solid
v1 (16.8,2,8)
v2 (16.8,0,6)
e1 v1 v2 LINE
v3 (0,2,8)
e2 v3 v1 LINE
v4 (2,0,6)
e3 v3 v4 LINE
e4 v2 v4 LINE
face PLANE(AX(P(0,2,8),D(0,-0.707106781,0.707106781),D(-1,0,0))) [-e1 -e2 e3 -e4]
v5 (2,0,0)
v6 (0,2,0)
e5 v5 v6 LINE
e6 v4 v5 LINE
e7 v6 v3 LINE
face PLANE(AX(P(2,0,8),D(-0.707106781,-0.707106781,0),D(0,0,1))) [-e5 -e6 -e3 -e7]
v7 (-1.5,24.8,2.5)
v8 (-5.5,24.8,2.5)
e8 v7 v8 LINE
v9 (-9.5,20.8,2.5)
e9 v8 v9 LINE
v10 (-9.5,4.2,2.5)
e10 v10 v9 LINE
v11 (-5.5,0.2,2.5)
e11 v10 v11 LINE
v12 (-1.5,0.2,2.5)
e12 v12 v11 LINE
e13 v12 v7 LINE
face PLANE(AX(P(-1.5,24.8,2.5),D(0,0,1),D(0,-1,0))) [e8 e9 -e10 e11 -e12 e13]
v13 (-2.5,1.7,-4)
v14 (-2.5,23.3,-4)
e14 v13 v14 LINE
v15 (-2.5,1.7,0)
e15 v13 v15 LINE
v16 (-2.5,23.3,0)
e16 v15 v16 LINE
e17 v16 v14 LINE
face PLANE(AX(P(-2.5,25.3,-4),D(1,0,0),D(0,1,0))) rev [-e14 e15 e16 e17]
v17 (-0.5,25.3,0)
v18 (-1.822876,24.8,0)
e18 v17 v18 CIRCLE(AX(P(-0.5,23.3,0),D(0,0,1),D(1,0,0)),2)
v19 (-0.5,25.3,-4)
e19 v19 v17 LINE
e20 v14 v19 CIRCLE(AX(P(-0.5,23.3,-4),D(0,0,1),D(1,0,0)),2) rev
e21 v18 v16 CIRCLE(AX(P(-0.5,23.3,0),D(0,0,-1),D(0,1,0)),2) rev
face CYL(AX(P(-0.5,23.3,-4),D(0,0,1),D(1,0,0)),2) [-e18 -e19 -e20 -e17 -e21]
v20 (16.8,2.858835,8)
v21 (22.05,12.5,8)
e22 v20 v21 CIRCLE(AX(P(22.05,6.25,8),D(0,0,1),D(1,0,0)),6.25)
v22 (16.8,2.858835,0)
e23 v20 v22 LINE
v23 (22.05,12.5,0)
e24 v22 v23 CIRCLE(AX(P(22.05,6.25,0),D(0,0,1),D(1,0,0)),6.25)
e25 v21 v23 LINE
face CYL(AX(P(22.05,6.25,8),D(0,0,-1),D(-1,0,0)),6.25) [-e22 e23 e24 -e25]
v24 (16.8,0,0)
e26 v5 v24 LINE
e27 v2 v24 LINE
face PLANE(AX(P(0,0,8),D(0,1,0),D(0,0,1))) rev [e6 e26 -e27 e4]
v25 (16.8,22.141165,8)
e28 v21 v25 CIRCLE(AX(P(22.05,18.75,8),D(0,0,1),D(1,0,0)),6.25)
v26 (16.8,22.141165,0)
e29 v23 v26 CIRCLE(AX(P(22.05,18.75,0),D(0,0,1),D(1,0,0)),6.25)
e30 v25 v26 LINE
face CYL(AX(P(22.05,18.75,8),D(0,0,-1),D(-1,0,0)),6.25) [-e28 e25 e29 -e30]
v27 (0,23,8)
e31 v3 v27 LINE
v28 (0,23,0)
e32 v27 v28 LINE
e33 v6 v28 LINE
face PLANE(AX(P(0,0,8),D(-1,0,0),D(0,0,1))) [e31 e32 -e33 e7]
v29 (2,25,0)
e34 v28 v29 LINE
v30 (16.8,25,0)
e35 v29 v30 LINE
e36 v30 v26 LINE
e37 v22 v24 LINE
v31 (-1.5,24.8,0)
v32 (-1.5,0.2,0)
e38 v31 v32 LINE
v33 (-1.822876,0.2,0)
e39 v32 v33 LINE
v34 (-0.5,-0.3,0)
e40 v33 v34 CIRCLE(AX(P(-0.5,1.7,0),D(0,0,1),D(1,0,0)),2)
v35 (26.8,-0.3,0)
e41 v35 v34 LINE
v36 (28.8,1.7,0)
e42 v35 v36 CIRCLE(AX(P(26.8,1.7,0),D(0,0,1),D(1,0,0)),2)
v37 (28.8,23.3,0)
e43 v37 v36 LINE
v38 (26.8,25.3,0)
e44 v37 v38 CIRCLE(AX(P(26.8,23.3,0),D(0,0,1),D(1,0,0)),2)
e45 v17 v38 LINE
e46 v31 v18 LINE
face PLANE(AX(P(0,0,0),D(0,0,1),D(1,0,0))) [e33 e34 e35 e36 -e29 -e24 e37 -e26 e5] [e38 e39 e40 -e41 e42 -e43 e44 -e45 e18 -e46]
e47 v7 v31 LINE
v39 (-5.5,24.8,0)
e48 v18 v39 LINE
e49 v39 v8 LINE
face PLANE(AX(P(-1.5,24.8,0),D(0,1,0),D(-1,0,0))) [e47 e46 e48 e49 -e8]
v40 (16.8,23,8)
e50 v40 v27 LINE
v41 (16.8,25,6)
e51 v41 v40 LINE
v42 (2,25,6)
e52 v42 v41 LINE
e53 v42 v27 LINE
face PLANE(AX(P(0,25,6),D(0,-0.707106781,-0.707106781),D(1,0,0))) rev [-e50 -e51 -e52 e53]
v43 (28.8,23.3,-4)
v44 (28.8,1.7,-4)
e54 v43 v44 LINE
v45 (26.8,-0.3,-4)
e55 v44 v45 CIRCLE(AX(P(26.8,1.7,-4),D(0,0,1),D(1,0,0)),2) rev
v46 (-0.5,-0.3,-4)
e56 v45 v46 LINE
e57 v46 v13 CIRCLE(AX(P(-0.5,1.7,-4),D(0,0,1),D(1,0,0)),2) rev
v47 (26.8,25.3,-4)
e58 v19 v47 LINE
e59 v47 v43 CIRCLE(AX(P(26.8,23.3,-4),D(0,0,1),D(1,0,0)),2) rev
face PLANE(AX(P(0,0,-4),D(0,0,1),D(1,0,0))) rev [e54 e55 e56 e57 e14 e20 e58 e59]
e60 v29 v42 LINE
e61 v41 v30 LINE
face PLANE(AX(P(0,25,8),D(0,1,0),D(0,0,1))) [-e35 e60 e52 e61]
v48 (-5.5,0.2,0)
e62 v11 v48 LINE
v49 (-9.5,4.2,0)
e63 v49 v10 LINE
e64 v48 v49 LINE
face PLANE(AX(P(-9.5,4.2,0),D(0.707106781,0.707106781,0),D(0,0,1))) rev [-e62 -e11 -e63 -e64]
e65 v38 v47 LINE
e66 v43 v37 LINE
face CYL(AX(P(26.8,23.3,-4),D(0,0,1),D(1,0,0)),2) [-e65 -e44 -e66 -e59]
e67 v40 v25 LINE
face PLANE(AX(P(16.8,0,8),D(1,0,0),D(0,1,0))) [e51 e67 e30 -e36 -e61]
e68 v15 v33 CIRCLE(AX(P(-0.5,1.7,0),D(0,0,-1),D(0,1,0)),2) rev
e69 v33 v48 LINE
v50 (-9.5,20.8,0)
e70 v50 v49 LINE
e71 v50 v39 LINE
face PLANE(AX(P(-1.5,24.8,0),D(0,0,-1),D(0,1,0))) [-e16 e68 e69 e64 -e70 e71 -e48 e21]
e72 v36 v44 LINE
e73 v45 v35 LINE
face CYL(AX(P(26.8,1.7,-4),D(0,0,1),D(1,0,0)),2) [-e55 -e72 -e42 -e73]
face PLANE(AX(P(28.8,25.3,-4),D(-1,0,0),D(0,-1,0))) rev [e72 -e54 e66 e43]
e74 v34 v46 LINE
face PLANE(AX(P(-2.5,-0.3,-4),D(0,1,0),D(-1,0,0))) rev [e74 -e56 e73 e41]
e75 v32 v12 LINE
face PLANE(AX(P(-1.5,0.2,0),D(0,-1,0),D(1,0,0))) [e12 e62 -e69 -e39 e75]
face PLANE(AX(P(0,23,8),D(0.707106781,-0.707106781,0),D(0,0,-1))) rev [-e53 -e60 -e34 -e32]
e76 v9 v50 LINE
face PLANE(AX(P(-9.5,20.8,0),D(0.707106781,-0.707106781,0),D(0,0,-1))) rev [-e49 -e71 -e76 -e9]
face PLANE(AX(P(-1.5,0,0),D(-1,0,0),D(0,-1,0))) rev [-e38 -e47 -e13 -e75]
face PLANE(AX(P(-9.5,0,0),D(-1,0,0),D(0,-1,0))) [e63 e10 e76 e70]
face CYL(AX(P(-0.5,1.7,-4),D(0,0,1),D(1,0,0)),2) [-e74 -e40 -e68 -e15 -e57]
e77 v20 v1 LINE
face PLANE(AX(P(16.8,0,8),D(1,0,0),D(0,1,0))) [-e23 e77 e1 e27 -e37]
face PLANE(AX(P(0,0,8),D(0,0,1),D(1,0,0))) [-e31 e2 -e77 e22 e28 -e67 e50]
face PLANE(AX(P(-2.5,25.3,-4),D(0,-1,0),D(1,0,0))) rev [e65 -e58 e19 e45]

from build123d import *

# Parameters (mm, degrees)
SKETCH_1_W            = 1
SKETCH_1_H            = 2
EXTRUDE_1_DEPTH       = 8
SKETCH_2_W            = 31.3
SKETCH_2_H            = 25.6
EXTRUDE_12_DEPTH      = 4
EXTRUDE_13_DEPTH      = 7
EXTRUDE_13_DEPTH_BACK = 1
SKETCH_3_W            = 2.5
SKETCH_3_H            = 24.6
CHAMFER_1_SIZE        = 4
FILLET_1_R            = 2
CHAMFER_2_SIZE        = 2


with BuildPart() as part:
    # 草图1 → 凸台-拉伸1 (new body)
    with BuildSketch(Plane.XY):
        Polygon((0, 25), (0, 0), (15.8, 0), (15.8, 6.250000037), (15.8, 11.5), (15.8, 13.5), (15.8, 18.749999979), (15.8, 25), align=None)
        with BuildLine():
            Line((16.8, 25), (15.8, 25))
            Line((15.8, 25), (15.8, 18.749999979))
            ThreePointArc((15.8, 18.749999979), (16.055210593, 20.517766943), (16.8, 22.141164992))
            Line((16.8, 22.141164992), (16.8, 25))
        make_face()
        with BuildLine():
            ThreePointArc((16.8, 22.141164992), (16.055210593, 20.517766943), (15.8, 18.749999979))
            ThreePointArc((15.8, 18.749999979), (16.055210599, 16.982233037), (16.8, 15.358835008))
            Line((16.8, 15.358835008), (16.8, 22.141164992))
        make_face()
        with BuildLine():
            ThreePointArc((16.8, 15.358835008), (16.055210599, 16.982233037), (15.8, 18.749999979))
            Line((15.8, 18.749999979), (15.8, 13.5))
            Line((15.8, 13.5), (16.8, 13.5))
            Line((16.8, 13.5), (16.8, 15.358835008))
        make_face()
        with BuildLine():
            ThreePointArc((28.3, 18.75), (26.469417382, 23.169417382), (22.05, 25))
            ThreePointArc((22.05, 25), (19.061043761, 24.238956239), (16.8, 22.141164992))
            Line((16.8, 22.141164992), (16.8, 15.358835008))
            ThreePointArc((16.8, 15.358835008), (17.630582618, 14.330582618), (18.658835008, 13.5))
            Line((18.658835008, 13.5), (25.441164992, 13.5))
            ThreePointArc((25.441164992, 13.5), (27.538956239, 15.761043761), (28.3, 18.75))
        make_face()
        with BuildLine():
            ThreePointArc((18.658835008, 13.5), (17.630582618, 14.330582618), (16.8, 15.358835008))
            Line((16.8, 15.358835008), (16.8, 13.5))
            Line((16.8, 13.5), (18.658835008, 13.5))
        make_face()
        with BuildLine():
            ThreePointArc((16.8, 2.858835008), (19.061043761, 0.761043761), (22.05, 0))
            ThreePointArc((22.05, 0), (26.469417382, 1.830582618), (28.3, 6.25))
            ThreePointArc((28.3, 6.25), (27.538956239, 9.238956239), (25.441164992, 11.5))
            Line((25.441164992, 11.5), (18.658835008, 11.5))
            ThreePointArc((18.658835008, 11.5), (17.630582618, 10.669417382), (16.8, 9.641164992))
            Line((16.8, 9.641164992), (16.8, 2.858835008))
        make_face()
        with BuildLine():
            Line((16.8, 11.5), (16.8, 9.641164992))
            ThreePointArc((16.8, 9.641164992), (17.630582618, 10.669417382), (18.658835008, 11.5))
            Line((18.658835008, 11.5), (16.8, 11.5))
        make_face()
        with BuildLine():
            Line((16.8, 13.5), (16.8, 11.5))
            Line((16.8, 11.5), (18.658835008, 11.5))
            ThreePointArc((18.658835008, 11.5), (20.282233047, 12.244789404), (22.05, 12.5))
            ThreePointArc((22.05, 12.5), (20.282233047, 12.755210596), (18.658835008, 13.5))
            Line((18.658835008, 13.5), (16.8, 13.5))
        make_face()
        with Locations((16.3, 12.5)):
            Rectangle(SKETCH_1_W, SKETCH_1_H)
        with BuildLine():
            ThreePointArc((16.8, 9.641164992), (16.055210601, 8.017766971), (15.8, 6.250000037))
            ThreePointArc((15.8, 6.250000037), (16.055210591, 4.482233065), (16.8, 2.858835008))
            Line((16.8, 2.858835008), (16.8, 9.641164992))
        make_face()
        with BuildLine():
            Line((15.8, 11.5), (15.8, 6.250000037))
            ThreePointArc((15.8, 6.250000037), (16.055210601, 8.017766971), (16.8, 9.641164992))
            Line((16.8, 9.641164992), (16.8, 11.5))
            Line((16.8, 11.5), (15.8, 11.5))
        make_face()
        with BuildLine():
            Line((15.8, 6.250000037), (15.8, 0))
            Line((15.8, 0), (16.8, 0))
            Line((16.8, 0), (16.8, 2.858835008))
            ThreePointArc((16.8, 2.858835008), (16.055210591, 4.482233065), (15.8, 6.250000037))
        make_face()
        with BuildLine():
            ThreePointArc((22.05, 12.5), (20.282233047, 12.244789404), (18.658835008, 11.5))
            Line((18.658835008, 11.5), (25.441164992, 11.5))
            ThreePointArc((25.441164992, 11.5), (23.817766953, 12.244789404), (22.05, 12.5))
        make_face()
        with BuildLine():
            ThreePointArc((18.658835008, 13.5), (20.282233047, 12.755210596), (22.05, 12.5))
            ThreePointArc((22.05, 12.5), (23.817766953, 12.755210596), (25.441164992, 13.5))
            Line((25.441164992, 13.5), (18.658835008, 13.5))
        make_face()
    extrude(amount=EXTRUDE_1_DEPTH)

    # 草图2 → 凸台-拉伸12 (add)
    with BuildSketch(Plane(origin=(0, 0, 0), x_dir=(-1, 0, 0), z_dir=(0, 0, -1))):
        with Locations((-13.15, 12.5)):
            Rectangle(SKETCH_2_W, SKETCH_2_H)
    extrude(amount=EXTRUDE_12_DEPTH)

    # 草图3 → 凸台-拉伸13 (add, two sides: drawn at the far end of the back side and taken through both)
    with BuildSketch(Plane.ZY.offset(2.5).offset(-EXTRUDE_13_DEPTH_BACK)):
        with Locations((1.25, 12.5)):
            Rectangle(SKETCH_3_W, SKETCH_3_H)
    extrude(amount=EXTRUDE_13_DEPTH + EXTRUDE_13_DEPTH_BACK)

    # 倒角1
    chamfer_1_edges = [part.edges().sort_by_distance(p)[0] for p in [
        (-9.5, 0.2, 1.25),
        (-9.5, 24.8, 1.25),
    ]]
    chamfer(chamfer_1_edges, length=CHAMFER_1_SIZE)

    # 圆角1
    # the kernel refuses this fillet: 2 mm, written as the material it takes off along each edge
    with BuildSketch(Plane(origin=(-2.5, -0.3, 0), x_dir=(0, 1, 0), z_dir=(0, 0, -1))) as fillet_1_piece_1:
        with BuildLine():
            CenterArc((FILLET_1_R, FILLET_1_R), FILLET_1_R, 180, 90)
            Line((0, FILLET_1_R), (0, 0))
            Line((0, 0), (FILLET_1_R, 0))
        make_face()
    extrude(amount=9, mode=Mode.SUBTRACT)
    with BuildSketch(Plane(origin=(-2.5, 25.3, 0), x_dir=(0, -1, 0), z_dir=(0, 0, -1))) as fillet_1_piece_2:
        with BuildLine():
            CenterArc((FILLET_1_R, -FILLET_1_R), FILLET_1_R, 90, 90)
            Line((0, -FILLET_1_R), (0, 0))
            Line((0, 0), (FILLET_1_R, 0))
        make_face()
    extrude(amount=9, mode=Mode.SUBTRACT)
    with BuildSketch(Plane(origin=(28.8, 25.3, 5), x_dir=(-1, 0, 0), z_dir=(0, 0, -1))) as fillet_1_piece_3:
        with BuildLine():
            CenterArc((FILLET_1_R, -FILLET_1_R), FILLET_1_R, 90, 90)
            Line((0, -FILLET_1_R), (0, 0))
            Line((0, 0), (FILLET_1_R, 0))
        make_face()
    extrude(amount=14, mode=Mode.SUBTRACT)
    with BuildSketch(Plane(origin=(28.8, -0.3, 5), x_dir=(-1, 0, 0), z_dir=(0, 0, -1))) as fillet_1_piece_4:
        with BuildLine():
            CenterArc((FILLET_1_R, FILLET_1_R), FILLET_1_R, 180, 90)
            Line((0, FILLET_1_R), (0, 0))
            Line((0, 0), (FILLET_1_R, 0))
        make_face()
    extrude(amount=14, mode=Mode.SUBTRACT)

    # 倒角2
    chamfer_2_edges = [part.edges().sort_by_distance(p)[0] for p in [
        (0, 0, 4),
        (0, 25, 4),
        (8.4, 25, 8),
        (8.4, 0, 8),
    ]]
    chamfer(chamfer_2_edges, length=CHAMFER_2_SIZE)


solid = part.part
